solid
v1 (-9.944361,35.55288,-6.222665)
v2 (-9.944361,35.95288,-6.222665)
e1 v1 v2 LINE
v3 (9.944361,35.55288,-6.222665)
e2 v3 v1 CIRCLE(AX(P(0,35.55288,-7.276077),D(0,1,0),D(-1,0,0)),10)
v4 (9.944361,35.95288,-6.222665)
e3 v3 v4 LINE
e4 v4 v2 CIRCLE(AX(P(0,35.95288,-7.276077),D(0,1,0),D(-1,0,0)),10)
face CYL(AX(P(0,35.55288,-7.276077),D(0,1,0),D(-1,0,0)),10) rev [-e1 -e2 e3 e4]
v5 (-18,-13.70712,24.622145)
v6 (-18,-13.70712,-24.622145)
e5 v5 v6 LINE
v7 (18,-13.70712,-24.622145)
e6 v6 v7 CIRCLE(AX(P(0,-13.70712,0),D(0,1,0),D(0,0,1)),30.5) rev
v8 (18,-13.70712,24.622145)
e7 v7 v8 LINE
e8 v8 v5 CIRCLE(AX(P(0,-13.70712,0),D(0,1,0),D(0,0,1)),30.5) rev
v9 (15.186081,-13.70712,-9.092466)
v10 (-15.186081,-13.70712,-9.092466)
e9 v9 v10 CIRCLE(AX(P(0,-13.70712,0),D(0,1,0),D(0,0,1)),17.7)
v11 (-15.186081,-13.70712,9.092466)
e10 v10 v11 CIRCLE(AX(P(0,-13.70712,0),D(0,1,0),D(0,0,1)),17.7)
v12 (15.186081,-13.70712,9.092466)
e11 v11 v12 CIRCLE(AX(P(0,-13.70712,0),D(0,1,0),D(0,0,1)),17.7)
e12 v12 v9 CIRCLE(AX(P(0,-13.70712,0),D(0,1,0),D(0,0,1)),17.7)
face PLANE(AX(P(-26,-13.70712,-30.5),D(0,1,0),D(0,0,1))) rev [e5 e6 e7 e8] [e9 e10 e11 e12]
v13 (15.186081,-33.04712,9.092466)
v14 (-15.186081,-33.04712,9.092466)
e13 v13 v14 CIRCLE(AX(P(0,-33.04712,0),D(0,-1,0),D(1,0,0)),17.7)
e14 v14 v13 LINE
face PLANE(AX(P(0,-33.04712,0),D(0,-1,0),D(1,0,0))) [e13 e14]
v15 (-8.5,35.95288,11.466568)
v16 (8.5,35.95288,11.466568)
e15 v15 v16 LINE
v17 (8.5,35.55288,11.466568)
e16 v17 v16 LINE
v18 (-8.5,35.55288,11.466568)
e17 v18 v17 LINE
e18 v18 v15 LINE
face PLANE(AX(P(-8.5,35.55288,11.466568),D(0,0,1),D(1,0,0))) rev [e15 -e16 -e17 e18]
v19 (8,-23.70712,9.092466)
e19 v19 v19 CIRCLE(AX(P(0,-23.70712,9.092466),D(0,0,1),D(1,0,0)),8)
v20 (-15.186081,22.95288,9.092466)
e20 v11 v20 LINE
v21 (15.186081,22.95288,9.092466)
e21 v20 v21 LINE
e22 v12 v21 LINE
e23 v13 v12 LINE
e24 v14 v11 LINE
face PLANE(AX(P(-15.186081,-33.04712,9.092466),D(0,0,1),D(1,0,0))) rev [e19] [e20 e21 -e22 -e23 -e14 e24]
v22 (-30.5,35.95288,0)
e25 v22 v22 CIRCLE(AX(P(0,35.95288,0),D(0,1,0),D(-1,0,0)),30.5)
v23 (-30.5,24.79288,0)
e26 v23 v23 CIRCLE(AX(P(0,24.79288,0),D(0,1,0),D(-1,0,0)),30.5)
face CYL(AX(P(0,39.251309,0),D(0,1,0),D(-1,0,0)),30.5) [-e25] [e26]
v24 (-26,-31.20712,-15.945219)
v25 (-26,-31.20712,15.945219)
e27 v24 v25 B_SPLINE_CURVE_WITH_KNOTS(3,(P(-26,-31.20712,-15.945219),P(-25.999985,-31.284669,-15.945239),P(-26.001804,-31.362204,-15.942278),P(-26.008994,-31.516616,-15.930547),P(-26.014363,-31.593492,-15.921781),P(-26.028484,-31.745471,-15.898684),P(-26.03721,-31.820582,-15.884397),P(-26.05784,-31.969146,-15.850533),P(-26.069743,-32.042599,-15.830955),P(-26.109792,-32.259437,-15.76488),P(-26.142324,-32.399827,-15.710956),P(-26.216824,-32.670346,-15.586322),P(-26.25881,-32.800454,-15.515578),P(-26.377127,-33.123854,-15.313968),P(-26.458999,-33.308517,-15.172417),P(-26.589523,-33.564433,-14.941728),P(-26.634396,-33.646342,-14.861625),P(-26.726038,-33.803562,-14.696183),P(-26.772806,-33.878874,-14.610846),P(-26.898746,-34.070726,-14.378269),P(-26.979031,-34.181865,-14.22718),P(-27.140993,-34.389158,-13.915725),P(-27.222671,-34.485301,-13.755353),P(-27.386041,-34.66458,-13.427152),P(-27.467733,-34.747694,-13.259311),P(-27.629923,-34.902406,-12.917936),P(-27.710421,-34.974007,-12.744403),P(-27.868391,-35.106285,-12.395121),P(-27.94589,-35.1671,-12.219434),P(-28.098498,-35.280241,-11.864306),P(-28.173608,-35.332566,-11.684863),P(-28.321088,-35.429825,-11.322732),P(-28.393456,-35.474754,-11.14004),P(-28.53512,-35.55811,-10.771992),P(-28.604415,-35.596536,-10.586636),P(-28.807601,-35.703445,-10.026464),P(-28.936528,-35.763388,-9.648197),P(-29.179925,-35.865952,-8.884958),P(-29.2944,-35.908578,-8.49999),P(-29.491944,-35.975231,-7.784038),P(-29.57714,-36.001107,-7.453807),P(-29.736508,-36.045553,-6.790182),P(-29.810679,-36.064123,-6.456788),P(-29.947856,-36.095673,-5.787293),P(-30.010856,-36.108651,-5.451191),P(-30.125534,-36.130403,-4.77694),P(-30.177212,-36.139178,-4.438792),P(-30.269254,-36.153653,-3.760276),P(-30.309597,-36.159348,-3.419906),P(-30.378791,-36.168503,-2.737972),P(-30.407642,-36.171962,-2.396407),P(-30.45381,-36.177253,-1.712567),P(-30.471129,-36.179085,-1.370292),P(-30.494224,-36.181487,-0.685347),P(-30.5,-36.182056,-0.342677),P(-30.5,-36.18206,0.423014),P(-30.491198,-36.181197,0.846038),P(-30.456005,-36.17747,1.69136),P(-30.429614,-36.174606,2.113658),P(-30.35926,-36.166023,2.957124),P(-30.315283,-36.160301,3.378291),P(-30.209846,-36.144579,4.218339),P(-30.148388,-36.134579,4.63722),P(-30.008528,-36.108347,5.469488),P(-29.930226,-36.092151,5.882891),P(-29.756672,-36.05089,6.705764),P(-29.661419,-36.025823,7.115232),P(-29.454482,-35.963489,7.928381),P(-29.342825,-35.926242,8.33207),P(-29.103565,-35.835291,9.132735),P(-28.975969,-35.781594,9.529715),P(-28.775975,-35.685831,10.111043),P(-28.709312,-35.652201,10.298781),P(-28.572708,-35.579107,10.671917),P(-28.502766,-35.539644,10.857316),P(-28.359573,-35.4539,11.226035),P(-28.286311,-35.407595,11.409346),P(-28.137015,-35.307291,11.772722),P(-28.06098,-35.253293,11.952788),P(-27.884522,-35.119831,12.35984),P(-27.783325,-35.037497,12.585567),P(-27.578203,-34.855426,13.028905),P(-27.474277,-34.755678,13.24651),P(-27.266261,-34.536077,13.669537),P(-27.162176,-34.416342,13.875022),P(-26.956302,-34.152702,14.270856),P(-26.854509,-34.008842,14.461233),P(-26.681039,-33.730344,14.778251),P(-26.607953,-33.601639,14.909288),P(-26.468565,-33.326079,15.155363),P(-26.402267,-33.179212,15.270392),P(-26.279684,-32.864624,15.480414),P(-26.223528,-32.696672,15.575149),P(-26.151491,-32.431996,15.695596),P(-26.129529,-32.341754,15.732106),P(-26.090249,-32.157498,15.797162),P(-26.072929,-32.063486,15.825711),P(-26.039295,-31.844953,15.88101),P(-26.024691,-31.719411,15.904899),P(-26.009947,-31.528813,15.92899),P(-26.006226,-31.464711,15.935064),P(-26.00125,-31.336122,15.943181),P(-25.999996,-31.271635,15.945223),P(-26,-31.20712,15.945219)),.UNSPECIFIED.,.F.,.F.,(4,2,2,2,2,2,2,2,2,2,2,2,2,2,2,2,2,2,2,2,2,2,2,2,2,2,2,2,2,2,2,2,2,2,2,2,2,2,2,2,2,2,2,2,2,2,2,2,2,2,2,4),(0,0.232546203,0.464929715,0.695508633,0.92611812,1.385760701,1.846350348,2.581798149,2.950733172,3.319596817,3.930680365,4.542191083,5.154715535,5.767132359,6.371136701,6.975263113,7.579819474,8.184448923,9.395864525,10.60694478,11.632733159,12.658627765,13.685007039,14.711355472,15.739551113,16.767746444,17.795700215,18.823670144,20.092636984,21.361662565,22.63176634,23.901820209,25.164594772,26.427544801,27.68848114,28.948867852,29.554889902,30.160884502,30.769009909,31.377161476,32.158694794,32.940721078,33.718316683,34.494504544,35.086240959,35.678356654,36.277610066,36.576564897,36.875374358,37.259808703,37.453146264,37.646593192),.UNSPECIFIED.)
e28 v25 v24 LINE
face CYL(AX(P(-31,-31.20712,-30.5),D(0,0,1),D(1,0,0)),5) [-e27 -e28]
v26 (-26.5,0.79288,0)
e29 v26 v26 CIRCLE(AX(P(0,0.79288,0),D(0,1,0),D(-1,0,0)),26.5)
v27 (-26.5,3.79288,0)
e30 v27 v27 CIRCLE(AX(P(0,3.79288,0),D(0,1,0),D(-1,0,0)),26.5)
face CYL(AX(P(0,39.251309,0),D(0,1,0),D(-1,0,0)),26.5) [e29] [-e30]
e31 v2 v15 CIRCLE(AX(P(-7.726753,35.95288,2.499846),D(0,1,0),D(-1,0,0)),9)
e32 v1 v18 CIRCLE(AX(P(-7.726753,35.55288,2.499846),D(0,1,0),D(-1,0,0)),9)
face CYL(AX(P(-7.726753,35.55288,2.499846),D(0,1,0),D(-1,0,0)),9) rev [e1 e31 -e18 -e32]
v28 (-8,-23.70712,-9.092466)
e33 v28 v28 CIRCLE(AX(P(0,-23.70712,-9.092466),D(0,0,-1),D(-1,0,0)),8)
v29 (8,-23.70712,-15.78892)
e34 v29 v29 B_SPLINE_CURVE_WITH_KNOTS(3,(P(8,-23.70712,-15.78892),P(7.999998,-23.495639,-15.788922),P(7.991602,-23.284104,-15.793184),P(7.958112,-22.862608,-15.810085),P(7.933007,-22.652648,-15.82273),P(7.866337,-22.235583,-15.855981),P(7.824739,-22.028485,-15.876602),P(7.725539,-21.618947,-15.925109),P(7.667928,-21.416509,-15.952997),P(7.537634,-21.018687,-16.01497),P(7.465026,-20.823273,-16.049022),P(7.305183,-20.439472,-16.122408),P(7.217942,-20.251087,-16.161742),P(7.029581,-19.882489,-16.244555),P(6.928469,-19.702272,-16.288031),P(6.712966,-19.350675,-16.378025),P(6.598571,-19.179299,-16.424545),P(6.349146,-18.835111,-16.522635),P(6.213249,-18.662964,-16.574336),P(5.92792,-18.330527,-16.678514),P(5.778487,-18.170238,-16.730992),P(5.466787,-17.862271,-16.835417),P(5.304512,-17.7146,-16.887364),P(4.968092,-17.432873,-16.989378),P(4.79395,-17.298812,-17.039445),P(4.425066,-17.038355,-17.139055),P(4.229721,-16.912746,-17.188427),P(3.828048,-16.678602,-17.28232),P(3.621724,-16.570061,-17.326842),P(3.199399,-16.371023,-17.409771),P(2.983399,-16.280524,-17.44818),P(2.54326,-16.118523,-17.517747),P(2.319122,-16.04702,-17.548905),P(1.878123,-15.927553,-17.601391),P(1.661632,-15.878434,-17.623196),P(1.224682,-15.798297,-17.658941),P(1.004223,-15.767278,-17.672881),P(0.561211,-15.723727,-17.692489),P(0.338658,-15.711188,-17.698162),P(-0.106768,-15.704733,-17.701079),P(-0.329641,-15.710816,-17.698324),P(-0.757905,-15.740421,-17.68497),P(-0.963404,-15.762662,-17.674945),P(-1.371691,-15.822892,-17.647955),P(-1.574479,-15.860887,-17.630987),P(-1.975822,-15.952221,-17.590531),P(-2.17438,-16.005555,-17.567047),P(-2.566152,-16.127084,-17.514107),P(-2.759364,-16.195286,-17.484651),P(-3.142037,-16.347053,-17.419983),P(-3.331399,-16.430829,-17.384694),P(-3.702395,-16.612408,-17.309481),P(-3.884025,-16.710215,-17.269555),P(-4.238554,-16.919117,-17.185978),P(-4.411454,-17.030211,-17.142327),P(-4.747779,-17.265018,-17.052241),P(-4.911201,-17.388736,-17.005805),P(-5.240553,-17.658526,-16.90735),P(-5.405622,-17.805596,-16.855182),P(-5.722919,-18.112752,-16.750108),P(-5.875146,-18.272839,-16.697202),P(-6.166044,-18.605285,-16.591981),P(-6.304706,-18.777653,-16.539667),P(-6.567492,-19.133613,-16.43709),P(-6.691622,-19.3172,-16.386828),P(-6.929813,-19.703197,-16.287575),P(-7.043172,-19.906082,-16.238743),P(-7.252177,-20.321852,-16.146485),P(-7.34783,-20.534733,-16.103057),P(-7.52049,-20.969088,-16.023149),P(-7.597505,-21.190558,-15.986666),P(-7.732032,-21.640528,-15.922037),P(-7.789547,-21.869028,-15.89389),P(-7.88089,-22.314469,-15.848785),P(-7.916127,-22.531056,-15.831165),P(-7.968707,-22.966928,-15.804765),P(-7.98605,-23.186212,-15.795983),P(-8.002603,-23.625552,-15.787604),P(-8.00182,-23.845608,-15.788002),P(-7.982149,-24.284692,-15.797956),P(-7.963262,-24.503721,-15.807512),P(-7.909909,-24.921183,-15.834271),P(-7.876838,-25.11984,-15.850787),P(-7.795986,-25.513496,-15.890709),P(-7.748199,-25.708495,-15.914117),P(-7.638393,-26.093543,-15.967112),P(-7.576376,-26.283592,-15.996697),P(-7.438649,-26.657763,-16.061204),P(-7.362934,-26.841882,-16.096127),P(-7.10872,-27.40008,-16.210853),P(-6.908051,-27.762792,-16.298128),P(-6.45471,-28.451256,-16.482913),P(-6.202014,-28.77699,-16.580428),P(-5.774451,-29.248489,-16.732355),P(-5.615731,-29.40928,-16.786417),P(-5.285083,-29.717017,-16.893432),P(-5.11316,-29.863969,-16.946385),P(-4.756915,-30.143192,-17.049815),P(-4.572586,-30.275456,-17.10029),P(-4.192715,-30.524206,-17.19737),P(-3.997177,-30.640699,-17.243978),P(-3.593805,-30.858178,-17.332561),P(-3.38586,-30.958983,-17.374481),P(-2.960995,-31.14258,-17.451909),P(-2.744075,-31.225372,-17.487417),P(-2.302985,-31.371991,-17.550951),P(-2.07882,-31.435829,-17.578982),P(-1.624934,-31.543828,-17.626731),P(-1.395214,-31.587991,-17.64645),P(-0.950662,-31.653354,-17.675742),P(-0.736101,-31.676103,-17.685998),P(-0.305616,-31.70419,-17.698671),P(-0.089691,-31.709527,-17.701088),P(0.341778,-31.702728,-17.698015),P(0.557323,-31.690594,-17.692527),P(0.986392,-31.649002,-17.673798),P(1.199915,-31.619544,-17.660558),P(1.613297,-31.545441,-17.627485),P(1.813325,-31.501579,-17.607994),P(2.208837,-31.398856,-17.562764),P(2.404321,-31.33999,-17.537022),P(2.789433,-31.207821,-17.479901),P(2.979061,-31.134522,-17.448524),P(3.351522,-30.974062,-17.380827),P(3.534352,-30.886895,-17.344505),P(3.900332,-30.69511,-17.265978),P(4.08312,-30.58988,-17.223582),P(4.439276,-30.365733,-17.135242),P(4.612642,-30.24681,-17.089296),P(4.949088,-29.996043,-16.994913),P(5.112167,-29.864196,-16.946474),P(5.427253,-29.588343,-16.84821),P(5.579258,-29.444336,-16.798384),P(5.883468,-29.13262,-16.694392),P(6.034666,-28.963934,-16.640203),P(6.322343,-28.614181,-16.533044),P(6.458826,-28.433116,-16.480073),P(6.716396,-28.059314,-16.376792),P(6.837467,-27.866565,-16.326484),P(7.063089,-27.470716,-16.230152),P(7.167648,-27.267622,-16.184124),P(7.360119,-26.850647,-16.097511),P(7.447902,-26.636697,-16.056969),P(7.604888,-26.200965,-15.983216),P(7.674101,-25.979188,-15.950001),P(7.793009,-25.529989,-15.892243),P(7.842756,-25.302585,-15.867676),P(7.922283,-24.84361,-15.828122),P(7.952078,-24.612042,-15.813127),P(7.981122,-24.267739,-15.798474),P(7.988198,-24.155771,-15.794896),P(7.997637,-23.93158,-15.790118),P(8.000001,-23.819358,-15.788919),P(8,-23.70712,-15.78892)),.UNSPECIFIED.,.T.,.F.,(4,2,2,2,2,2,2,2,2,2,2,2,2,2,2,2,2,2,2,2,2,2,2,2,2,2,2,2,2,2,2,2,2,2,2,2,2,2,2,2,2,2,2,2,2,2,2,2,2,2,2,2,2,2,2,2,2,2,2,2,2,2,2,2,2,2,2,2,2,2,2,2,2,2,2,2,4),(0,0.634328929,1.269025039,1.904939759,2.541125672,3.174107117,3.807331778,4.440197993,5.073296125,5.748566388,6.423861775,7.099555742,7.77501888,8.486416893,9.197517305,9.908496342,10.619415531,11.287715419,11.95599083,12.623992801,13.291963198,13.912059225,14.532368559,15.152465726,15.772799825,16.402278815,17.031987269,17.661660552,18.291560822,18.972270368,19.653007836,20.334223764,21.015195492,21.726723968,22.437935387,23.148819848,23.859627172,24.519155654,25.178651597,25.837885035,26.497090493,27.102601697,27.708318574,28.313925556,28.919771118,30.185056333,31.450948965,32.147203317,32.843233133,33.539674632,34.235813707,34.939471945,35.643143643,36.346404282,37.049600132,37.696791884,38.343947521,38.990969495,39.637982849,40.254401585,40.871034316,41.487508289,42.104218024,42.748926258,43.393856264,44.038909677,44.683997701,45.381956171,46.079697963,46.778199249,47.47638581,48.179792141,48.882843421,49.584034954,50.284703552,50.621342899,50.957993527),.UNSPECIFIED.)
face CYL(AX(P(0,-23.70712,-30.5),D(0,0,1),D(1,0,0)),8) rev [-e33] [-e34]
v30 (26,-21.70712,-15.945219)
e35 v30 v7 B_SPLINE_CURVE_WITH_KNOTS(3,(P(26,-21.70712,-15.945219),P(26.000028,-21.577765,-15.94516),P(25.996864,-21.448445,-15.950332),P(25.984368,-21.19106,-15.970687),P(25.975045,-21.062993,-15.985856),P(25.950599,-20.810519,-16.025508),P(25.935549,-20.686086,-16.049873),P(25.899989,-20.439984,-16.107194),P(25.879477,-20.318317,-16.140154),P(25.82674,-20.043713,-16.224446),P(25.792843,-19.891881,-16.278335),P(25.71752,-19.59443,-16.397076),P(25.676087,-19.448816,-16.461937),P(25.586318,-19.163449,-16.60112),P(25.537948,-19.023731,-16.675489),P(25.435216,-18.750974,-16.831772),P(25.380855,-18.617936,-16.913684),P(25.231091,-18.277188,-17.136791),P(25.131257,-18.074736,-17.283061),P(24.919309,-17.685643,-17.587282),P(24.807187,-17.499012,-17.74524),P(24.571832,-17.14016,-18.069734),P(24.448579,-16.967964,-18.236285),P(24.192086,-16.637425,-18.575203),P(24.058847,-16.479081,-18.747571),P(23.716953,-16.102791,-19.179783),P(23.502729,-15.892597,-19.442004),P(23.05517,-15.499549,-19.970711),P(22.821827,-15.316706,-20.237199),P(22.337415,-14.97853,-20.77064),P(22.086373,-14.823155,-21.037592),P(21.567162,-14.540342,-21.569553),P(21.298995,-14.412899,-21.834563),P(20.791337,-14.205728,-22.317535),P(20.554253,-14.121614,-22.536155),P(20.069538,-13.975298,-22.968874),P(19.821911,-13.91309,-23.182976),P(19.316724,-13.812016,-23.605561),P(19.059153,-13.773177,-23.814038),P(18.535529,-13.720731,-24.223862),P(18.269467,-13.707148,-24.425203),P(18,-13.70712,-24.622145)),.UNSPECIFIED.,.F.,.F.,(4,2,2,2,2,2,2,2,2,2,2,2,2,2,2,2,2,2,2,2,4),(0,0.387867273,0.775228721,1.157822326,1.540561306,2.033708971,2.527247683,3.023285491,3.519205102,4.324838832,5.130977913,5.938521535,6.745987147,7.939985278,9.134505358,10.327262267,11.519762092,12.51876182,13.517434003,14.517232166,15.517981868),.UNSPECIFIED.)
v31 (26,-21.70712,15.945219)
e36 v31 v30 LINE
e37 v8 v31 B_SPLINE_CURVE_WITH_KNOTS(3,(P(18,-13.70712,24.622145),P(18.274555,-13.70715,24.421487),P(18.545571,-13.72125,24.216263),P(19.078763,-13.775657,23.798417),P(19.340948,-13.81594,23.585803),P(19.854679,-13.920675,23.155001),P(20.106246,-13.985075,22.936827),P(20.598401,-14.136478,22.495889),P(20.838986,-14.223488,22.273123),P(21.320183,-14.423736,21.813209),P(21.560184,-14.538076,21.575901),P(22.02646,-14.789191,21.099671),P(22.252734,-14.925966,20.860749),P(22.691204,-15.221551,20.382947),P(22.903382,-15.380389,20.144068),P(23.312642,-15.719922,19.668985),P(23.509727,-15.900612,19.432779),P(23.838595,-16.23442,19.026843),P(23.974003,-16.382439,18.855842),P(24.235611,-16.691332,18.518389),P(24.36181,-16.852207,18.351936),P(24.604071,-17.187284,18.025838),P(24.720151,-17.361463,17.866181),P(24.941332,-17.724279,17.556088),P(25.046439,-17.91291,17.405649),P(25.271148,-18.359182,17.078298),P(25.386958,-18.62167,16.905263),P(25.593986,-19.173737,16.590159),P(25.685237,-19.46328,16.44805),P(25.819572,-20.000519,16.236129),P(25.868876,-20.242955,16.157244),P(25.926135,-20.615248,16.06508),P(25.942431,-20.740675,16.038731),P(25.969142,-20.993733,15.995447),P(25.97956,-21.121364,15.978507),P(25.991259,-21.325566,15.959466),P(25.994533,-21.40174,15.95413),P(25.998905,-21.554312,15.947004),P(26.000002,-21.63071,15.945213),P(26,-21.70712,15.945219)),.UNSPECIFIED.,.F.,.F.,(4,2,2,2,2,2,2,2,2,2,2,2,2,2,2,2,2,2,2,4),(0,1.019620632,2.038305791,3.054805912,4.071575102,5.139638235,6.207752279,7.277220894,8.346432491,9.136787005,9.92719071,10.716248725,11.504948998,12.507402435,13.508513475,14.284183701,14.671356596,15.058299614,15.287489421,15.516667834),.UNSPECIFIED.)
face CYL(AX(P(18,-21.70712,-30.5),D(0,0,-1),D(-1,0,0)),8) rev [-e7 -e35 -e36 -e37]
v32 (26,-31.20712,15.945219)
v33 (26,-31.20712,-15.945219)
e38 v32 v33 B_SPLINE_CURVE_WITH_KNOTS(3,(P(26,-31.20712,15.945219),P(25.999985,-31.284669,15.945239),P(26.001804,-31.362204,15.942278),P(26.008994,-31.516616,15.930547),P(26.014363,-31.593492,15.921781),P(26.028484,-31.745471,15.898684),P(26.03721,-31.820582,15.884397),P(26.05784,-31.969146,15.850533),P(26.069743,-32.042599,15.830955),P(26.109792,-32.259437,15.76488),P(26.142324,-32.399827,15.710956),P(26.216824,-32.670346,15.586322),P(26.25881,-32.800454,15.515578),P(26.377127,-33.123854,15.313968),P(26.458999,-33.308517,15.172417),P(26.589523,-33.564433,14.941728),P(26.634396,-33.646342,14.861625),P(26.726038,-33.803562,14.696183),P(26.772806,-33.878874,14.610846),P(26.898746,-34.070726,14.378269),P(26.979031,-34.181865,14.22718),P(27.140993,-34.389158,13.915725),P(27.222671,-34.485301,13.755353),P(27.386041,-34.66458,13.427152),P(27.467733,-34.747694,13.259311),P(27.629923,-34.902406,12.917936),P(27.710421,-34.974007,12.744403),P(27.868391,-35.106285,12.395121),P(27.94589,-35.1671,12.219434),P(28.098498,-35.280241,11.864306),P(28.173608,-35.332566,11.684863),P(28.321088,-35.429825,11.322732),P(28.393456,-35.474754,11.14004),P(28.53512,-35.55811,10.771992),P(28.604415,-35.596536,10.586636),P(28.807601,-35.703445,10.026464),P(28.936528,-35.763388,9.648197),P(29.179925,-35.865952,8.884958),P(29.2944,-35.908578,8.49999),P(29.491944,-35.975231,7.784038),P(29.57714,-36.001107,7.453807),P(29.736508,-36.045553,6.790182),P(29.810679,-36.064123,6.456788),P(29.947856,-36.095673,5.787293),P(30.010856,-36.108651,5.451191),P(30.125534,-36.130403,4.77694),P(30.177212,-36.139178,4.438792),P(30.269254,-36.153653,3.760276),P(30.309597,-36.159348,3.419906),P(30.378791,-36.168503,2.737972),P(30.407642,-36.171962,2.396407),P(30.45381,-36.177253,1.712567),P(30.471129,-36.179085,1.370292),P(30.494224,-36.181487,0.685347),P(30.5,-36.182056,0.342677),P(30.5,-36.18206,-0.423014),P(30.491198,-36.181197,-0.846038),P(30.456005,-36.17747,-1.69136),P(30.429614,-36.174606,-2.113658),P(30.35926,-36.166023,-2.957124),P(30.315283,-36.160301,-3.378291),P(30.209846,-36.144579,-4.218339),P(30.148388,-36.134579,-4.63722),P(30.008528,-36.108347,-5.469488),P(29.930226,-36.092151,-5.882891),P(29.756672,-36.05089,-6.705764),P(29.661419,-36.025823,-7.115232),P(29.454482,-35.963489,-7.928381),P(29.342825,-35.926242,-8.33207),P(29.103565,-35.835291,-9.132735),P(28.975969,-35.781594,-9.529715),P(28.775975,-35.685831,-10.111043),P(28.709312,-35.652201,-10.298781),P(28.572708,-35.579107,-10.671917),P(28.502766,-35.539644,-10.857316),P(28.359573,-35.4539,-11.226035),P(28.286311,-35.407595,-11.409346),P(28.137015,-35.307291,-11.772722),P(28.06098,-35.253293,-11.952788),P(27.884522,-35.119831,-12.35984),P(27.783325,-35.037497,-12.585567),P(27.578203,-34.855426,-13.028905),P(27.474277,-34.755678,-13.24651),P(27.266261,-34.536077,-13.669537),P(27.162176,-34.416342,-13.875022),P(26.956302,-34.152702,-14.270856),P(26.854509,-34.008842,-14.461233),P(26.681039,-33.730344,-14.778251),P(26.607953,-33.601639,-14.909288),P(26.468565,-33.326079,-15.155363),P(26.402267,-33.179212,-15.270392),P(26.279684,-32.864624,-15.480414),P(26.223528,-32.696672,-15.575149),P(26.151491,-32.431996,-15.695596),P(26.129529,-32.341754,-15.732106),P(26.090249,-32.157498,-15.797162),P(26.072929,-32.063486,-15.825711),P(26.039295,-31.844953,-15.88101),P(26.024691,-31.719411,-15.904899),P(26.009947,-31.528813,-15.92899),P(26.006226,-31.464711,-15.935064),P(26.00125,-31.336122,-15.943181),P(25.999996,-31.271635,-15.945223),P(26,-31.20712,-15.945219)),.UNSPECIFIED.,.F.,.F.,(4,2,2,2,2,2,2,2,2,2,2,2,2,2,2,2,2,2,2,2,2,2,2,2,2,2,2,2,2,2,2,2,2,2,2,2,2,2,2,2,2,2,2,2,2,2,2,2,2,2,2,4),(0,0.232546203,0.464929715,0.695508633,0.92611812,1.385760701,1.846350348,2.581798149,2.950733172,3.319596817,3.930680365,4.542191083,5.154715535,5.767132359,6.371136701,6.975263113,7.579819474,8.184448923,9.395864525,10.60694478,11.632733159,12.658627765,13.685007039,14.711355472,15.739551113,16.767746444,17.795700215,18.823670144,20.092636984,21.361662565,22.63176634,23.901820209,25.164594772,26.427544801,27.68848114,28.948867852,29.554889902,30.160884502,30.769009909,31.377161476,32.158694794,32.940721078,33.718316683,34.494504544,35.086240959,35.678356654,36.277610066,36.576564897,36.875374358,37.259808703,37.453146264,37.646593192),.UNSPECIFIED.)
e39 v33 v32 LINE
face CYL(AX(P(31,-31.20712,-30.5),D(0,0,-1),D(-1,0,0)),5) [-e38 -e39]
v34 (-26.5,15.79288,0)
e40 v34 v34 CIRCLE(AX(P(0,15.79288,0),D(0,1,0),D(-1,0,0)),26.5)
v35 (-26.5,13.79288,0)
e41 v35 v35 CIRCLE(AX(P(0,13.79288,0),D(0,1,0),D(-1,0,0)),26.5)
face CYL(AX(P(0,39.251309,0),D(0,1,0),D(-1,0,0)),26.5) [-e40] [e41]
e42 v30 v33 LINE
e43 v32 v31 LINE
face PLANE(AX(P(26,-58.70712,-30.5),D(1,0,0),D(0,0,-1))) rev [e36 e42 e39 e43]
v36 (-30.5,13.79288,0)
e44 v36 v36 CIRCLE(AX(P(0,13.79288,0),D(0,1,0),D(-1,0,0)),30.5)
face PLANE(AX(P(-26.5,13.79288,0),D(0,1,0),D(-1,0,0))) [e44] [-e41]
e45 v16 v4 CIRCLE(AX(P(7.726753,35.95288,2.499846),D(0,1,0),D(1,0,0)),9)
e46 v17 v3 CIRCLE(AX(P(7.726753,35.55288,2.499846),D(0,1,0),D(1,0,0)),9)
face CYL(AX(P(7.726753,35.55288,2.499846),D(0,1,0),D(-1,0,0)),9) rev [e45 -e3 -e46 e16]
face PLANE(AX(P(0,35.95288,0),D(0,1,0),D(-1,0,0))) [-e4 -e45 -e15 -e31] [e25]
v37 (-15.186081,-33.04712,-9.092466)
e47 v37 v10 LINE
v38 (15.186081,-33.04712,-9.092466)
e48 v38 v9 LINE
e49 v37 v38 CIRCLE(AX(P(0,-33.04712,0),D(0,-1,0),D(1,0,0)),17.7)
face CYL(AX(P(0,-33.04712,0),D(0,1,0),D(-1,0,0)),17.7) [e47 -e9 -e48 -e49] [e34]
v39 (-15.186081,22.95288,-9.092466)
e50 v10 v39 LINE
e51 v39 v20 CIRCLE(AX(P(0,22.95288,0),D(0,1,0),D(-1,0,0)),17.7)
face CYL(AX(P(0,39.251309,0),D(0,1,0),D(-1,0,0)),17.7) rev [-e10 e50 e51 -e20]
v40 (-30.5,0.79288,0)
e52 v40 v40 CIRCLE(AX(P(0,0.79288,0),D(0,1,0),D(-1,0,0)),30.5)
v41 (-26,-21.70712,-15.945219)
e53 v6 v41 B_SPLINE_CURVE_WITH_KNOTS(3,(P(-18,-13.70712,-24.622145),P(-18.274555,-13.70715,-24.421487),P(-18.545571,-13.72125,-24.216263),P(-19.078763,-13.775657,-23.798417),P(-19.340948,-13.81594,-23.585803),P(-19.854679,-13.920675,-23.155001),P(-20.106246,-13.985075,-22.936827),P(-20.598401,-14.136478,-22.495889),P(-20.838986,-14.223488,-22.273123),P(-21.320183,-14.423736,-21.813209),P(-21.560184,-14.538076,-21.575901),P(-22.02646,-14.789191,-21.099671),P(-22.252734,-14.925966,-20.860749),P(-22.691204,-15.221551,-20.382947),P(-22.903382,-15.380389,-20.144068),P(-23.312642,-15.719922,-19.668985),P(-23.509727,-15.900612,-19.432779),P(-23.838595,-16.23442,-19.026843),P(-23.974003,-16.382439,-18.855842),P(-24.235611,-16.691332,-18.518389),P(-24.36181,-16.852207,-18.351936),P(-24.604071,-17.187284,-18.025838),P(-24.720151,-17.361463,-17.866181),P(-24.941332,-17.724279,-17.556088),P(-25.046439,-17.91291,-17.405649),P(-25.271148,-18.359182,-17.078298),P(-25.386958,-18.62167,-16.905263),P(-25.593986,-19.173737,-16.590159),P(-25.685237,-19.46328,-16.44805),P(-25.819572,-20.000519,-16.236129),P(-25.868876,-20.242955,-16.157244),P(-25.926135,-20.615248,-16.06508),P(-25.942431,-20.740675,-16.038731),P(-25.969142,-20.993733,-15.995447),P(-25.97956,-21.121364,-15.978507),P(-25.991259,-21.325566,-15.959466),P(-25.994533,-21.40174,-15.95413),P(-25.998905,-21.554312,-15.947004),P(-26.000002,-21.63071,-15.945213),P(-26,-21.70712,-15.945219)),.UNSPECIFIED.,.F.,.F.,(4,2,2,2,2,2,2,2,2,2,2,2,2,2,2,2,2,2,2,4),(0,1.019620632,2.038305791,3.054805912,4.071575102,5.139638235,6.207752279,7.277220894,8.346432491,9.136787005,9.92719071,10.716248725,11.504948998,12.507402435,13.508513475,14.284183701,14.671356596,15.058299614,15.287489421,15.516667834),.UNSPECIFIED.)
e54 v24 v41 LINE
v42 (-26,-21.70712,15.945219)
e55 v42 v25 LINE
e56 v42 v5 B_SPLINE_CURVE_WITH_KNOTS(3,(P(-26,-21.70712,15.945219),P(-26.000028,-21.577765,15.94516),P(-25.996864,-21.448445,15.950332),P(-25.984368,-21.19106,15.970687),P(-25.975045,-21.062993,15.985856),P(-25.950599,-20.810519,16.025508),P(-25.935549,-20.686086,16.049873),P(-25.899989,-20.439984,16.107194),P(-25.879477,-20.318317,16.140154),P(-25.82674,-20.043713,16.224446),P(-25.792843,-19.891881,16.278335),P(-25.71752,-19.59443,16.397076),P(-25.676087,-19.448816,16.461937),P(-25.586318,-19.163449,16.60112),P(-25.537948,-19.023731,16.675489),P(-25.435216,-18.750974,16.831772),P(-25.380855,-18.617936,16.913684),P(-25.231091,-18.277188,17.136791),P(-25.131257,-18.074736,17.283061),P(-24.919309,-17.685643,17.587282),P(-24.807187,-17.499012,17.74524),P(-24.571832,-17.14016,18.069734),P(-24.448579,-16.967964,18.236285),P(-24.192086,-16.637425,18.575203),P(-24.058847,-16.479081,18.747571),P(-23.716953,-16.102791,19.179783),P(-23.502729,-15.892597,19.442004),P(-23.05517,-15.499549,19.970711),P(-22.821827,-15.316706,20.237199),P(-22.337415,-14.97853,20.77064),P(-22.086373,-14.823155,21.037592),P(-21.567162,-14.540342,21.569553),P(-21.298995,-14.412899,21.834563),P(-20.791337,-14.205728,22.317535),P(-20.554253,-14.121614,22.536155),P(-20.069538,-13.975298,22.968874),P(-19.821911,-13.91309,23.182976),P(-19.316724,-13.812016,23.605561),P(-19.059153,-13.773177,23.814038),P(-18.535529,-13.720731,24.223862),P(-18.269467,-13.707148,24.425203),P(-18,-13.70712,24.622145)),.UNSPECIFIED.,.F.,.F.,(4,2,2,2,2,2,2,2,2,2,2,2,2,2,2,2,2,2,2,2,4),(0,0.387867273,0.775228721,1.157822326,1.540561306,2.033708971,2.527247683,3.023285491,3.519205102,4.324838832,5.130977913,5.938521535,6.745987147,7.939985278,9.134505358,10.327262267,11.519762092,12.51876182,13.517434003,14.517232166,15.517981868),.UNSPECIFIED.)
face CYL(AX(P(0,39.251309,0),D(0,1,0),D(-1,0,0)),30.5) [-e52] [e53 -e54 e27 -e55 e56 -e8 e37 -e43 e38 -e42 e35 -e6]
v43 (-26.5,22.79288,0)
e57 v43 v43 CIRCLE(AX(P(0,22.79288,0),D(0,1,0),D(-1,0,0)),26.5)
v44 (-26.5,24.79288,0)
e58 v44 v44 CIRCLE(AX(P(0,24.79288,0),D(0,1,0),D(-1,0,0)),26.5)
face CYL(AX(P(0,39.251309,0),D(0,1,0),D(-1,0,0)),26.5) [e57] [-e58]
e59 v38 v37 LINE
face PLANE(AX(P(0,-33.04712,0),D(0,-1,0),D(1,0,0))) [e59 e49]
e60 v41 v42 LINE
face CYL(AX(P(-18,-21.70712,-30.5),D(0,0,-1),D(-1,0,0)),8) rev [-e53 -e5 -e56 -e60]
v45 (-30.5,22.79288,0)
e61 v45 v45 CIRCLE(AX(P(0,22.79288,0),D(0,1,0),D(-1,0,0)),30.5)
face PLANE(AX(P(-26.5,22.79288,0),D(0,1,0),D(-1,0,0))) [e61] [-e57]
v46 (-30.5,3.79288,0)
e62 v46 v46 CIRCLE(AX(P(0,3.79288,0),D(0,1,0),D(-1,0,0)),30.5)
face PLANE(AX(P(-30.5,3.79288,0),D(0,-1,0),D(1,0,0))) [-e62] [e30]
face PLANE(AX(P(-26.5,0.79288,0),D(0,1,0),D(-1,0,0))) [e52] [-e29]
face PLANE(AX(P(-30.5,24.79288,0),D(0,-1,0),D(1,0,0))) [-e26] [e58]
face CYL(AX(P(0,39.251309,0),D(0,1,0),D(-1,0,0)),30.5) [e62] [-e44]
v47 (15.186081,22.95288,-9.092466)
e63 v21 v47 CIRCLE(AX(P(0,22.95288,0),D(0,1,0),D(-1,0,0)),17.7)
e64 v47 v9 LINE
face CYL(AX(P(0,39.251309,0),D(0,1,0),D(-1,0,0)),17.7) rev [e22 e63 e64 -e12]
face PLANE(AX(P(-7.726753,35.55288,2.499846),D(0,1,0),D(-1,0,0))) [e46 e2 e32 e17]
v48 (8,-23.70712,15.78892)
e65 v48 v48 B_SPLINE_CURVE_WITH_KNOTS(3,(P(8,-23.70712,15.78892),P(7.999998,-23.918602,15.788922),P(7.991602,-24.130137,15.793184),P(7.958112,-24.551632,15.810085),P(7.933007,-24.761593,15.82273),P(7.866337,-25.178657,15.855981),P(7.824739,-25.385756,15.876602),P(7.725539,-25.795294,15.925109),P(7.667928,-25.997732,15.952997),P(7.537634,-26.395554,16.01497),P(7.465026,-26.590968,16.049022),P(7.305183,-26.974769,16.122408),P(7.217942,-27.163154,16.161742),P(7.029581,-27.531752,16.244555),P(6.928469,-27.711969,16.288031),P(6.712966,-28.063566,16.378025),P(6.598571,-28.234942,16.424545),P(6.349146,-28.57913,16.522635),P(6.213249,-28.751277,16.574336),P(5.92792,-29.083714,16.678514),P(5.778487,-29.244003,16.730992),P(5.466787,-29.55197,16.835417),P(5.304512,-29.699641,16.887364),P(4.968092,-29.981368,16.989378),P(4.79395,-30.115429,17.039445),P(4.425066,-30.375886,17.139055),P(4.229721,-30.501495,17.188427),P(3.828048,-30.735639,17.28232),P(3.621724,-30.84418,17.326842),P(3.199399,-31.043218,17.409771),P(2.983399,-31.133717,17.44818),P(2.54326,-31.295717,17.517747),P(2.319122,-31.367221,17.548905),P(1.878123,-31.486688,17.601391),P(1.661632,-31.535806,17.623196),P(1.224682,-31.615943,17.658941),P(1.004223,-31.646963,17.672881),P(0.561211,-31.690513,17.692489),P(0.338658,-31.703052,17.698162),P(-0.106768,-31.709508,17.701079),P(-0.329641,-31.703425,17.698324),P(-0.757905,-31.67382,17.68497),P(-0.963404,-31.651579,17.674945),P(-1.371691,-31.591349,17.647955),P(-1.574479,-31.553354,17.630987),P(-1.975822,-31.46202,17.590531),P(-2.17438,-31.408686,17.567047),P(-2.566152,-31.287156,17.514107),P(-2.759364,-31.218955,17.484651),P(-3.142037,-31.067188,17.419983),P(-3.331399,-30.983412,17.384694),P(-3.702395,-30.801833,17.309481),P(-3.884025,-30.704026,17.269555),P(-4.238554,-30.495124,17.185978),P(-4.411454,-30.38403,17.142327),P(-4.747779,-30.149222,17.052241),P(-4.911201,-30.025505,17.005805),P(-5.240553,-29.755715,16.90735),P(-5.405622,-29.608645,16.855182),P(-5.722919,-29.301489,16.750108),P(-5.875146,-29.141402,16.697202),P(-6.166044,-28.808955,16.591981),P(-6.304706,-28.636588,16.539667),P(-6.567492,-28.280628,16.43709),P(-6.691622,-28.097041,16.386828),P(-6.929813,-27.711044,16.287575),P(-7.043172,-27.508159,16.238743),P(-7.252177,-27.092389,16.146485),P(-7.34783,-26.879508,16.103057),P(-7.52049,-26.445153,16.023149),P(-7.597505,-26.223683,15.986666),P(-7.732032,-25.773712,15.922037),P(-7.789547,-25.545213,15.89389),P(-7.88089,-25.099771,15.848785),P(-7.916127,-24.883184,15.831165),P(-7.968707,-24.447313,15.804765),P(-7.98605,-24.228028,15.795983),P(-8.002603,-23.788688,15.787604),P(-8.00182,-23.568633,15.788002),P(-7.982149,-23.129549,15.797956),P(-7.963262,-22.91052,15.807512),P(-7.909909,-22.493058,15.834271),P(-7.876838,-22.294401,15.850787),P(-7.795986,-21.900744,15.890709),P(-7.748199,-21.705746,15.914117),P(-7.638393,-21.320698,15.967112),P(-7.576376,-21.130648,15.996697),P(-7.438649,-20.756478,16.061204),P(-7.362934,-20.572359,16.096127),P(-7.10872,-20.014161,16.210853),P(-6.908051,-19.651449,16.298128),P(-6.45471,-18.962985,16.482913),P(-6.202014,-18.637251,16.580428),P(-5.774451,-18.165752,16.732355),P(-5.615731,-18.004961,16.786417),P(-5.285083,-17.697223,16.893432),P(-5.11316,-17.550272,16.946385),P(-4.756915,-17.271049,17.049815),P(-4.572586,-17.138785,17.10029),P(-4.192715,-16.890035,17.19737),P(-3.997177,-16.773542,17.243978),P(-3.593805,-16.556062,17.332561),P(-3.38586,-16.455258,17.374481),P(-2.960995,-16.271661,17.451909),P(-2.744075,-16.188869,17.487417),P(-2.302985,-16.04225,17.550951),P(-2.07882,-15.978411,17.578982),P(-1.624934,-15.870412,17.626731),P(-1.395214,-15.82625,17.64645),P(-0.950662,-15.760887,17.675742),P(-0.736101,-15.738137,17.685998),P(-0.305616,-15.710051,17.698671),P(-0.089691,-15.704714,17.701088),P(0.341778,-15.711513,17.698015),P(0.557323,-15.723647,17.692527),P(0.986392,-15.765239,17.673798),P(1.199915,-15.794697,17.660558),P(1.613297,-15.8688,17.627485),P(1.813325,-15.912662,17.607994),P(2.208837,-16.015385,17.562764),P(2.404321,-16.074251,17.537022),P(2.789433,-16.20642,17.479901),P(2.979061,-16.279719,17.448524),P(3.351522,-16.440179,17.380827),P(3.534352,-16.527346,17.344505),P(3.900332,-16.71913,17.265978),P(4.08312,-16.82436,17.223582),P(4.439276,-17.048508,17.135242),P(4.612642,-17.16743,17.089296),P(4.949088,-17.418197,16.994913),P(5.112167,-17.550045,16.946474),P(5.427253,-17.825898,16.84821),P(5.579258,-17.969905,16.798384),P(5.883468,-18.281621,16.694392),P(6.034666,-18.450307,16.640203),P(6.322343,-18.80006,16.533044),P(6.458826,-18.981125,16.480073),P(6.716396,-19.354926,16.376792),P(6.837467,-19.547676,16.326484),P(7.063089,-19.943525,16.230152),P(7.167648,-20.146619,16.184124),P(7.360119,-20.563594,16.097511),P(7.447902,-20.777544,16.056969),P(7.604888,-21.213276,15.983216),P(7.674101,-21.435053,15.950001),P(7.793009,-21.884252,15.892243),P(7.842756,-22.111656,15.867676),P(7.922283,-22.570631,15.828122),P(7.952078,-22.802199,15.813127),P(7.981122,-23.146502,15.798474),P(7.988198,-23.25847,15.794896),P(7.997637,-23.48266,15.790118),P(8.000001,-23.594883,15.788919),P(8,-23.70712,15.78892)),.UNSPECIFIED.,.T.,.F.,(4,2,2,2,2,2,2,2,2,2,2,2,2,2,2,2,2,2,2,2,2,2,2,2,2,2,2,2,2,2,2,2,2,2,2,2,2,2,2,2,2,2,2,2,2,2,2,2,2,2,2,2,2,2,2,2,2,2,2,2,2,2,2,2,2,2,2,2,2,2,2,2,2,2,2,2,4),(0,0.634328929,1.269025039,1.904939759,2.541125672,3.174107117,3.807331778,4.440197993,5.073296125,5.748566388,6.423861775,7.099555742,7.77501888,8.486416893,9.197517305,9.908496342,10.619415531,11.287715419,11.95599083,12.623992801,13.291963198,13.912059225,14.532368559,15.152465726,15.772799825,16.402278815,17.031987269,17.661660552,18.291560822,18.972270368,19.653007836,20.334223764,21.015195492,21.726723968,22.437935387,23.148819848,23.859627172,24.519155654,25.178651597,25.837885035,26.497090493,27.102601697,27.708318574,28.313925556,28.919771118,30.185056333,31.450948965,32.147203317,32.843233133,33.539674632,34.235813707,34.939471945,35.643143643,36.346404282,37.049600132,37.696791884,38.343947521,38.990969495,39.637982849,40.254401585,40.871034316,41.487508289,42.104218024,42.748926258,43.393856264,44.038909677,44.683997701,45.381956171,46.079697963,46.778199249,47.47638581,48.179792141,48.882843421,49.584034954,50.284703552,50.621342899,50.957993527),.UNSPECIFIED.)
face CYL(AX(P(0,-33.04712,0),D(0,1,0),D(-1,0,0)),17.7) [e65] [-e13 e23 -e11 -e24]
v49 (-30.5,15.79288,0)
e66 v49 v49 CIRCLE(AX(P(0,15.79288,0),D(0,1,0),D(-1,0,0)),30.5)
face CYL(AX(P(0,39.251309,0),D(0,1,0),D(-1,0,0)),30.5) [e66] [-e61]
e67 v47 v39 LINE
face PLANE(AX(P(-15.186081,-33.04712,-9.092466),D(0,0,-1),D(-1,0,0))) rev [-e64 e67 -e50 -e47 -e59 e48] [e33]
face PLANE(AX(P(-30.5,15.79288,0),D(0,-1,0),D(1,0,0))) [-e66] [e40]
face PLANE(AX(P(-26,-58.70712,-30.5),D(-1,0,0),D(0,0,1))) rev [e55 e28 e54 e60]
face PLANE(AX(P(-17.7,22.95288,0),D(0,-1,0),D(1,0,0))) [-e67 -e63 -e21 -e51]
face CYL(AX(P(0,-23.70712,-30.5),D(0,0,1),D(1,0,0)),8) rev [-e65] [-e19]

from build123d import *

# Parameters (mm, degrees)
CUT_EXTRUDE1_DEPTH      = 57.315677826
CUT_EXTRUDE1_DEPTH_BACK = 57.315677826
SKETCH2_W               = 52
SKETCH2_H               = 45
FILLET1_R               = 8
BOSS_EXTRUDE1_DEPTH     = 56
CUT_EXTRUDE2_DEPTH      = 62.715224497
CUT_EXTRUDE2_DEPTH_BACK = 62.715224497
SKETCH4_R               = 8
FILLET2_START           = -17
FILLET2_DEPTH           = 34
CUT_EXTRUDE3_DEPTH      = 0.4


with BuildPart() as part:
    # Sketch1 → Revolve1 (revolve)
    with BuildSketch(Plane.XY):
        Polygon((0, 35.952879581), (-30.5, 35.952879581), (-30.5, 24.792879581), (-26.5, 24.792879581), (-26.5, 22.792879581), (-30.5, 22.792879581), (-30.5, 15.792879581), (-26.5, 15.792879581), (-26.5, 13.792879581), (-30.5, 13.792879581), (-30.5, 3.792879581), (-26.5, 3.792879581), (-26.5, 0.792879581), (-30.5, 0.792879581), (-30.5, -36.207120419), (-17.7, -36.207120419), (-17.7, 22.952879581), (0, 22.952879581), align=None)
    revolve(axis=Axis((0, 39.251308901, 0), (0, -1, 0)))

    # Sketch2 → Cut-Extrude1 (cut, two sides: drawn at the far end of the back side and taken through both)
    with BuildSketch(Plane.XY.offset(-CUT_EXTRUDE1_DEPTH_BACK)):
        with Locations((0, -36.207120419)):
            Rectangle(SKETCH2_W, SKETCH2_H)
    extrude(amount=CUT_EXTRUDE1_DEPTH + CUT_EXTRUDE1_DEPTH_BACK, mode=Mode.SUBTRACT)

    # Fillet1
    fillet1_edges = [part.edges().sort_by_distance(p)[0] for p in [
        (26, -13.707120419, 0),
        (-26, -13.707120419, 0),
    ]]
    fillet(fillet1_edges, radius=FILLET1_R)

    # Sketch3 → Boss-Extrude1 (add)
    with BuildSketch(Plane.XZ.offset(-22.952879581)):
        with BuildLine():
            Line((-15.186081342, -9.092465753), (15.186081342, -9.092465753))
            ThreePointArc((15.186081342, -9.092465753), (0, -17.7), (-15.186081342, -9.092465753))
        make_face()
        with BuildLine():
            Line((-15.186081342, 9.092465753), (15.186081342, 9.092465753))
            ThreePointArc((15.186081342, 9.092465753), (0, 17.7), (-15.186081342, 9.092465753))
        make_face()
    extrude(amount=BOSS_EXTRUDE1_DEPTH)

    # Sketch4 → Cut-Extrude2 (cut, two sides: drawn at the far end of the back side and taken through both)
    with BuildSketch(Plane.XY.offset(-9.092465753).offset(-CUT_EXTRUDE2_DEPTH_BACK)):
        with Locations((0, -23.707120419)):
            Circle(SKETCH4_R)
    extrude(amount=CUT_EXTRUDE2_DEPTH + CUT_EXTRUDE2_DEPTH_BACK, mode=Mode.SUBTRACT)

    # Fillet2: read off the stored shape, not the designer's step
    # Fillet2 outline → Fillet2 (cut)
    with BuildSketch(Plane.XY.offset(FILLET2_START)):
        with BuildLine():
            Line((30.749452468, -36.207120419), (30.500160015, -36.182073684))
            ThreePointArc((30.500160015, -36.182073684), (27.291954698, -34.561282019), (26, -31.207120419))
            Line((26, -31.207120419), (26, -36.207120419))
            Line((26, -36.207120419), (30.749452468, -36.207120419))
        make_face()
        with BuildLine():
            Line((-26, -36.207120419), (-26, -31.207120419))
            ThreePointArc((-26, -31.207120419), (-27.291900757, -34.561222386), (-30.500000003, -36.182057605))
            Line((-30.500000003, -36.182057605), (-30.749371855, -36.207120419))
            Line((-30.749371855, -36.207120419), (-26, -36.207120419))
        make_face()
    extrude(amount=FILLET2_DEPTH, mode=Mode.SUBTRACT)

    # Sketch5 → Cut-Extrude3 (cut)
    with BuildSketch(Plane(origin=(0, 35.952879581, 0), x_dir=(1, 0, 0), z_dir=(0, 1, 0))):
        with BuildLine():
            Line((-8.5, -11.466567669), (8.5, -11.466567669))
            ThreePointArc((8.5, -11.466567669), (16.696900168, -3.232277046), (9.94436139, 6.222665285))
            ThreePointArc((9.94436139, 6.222665285), (0, 17.276077147), (-9.94436139, 6.222665285))
            ThreePointArc((-9.94436139, 6.222665285), (-16.696900168, -3.232277046), (-8.5, -11.466567669))
        make_face()
    extrude(amount=-CUT_EXTRUDE3_DEPTH, mode=Mode.SUBTRACT)


solid = part.part
